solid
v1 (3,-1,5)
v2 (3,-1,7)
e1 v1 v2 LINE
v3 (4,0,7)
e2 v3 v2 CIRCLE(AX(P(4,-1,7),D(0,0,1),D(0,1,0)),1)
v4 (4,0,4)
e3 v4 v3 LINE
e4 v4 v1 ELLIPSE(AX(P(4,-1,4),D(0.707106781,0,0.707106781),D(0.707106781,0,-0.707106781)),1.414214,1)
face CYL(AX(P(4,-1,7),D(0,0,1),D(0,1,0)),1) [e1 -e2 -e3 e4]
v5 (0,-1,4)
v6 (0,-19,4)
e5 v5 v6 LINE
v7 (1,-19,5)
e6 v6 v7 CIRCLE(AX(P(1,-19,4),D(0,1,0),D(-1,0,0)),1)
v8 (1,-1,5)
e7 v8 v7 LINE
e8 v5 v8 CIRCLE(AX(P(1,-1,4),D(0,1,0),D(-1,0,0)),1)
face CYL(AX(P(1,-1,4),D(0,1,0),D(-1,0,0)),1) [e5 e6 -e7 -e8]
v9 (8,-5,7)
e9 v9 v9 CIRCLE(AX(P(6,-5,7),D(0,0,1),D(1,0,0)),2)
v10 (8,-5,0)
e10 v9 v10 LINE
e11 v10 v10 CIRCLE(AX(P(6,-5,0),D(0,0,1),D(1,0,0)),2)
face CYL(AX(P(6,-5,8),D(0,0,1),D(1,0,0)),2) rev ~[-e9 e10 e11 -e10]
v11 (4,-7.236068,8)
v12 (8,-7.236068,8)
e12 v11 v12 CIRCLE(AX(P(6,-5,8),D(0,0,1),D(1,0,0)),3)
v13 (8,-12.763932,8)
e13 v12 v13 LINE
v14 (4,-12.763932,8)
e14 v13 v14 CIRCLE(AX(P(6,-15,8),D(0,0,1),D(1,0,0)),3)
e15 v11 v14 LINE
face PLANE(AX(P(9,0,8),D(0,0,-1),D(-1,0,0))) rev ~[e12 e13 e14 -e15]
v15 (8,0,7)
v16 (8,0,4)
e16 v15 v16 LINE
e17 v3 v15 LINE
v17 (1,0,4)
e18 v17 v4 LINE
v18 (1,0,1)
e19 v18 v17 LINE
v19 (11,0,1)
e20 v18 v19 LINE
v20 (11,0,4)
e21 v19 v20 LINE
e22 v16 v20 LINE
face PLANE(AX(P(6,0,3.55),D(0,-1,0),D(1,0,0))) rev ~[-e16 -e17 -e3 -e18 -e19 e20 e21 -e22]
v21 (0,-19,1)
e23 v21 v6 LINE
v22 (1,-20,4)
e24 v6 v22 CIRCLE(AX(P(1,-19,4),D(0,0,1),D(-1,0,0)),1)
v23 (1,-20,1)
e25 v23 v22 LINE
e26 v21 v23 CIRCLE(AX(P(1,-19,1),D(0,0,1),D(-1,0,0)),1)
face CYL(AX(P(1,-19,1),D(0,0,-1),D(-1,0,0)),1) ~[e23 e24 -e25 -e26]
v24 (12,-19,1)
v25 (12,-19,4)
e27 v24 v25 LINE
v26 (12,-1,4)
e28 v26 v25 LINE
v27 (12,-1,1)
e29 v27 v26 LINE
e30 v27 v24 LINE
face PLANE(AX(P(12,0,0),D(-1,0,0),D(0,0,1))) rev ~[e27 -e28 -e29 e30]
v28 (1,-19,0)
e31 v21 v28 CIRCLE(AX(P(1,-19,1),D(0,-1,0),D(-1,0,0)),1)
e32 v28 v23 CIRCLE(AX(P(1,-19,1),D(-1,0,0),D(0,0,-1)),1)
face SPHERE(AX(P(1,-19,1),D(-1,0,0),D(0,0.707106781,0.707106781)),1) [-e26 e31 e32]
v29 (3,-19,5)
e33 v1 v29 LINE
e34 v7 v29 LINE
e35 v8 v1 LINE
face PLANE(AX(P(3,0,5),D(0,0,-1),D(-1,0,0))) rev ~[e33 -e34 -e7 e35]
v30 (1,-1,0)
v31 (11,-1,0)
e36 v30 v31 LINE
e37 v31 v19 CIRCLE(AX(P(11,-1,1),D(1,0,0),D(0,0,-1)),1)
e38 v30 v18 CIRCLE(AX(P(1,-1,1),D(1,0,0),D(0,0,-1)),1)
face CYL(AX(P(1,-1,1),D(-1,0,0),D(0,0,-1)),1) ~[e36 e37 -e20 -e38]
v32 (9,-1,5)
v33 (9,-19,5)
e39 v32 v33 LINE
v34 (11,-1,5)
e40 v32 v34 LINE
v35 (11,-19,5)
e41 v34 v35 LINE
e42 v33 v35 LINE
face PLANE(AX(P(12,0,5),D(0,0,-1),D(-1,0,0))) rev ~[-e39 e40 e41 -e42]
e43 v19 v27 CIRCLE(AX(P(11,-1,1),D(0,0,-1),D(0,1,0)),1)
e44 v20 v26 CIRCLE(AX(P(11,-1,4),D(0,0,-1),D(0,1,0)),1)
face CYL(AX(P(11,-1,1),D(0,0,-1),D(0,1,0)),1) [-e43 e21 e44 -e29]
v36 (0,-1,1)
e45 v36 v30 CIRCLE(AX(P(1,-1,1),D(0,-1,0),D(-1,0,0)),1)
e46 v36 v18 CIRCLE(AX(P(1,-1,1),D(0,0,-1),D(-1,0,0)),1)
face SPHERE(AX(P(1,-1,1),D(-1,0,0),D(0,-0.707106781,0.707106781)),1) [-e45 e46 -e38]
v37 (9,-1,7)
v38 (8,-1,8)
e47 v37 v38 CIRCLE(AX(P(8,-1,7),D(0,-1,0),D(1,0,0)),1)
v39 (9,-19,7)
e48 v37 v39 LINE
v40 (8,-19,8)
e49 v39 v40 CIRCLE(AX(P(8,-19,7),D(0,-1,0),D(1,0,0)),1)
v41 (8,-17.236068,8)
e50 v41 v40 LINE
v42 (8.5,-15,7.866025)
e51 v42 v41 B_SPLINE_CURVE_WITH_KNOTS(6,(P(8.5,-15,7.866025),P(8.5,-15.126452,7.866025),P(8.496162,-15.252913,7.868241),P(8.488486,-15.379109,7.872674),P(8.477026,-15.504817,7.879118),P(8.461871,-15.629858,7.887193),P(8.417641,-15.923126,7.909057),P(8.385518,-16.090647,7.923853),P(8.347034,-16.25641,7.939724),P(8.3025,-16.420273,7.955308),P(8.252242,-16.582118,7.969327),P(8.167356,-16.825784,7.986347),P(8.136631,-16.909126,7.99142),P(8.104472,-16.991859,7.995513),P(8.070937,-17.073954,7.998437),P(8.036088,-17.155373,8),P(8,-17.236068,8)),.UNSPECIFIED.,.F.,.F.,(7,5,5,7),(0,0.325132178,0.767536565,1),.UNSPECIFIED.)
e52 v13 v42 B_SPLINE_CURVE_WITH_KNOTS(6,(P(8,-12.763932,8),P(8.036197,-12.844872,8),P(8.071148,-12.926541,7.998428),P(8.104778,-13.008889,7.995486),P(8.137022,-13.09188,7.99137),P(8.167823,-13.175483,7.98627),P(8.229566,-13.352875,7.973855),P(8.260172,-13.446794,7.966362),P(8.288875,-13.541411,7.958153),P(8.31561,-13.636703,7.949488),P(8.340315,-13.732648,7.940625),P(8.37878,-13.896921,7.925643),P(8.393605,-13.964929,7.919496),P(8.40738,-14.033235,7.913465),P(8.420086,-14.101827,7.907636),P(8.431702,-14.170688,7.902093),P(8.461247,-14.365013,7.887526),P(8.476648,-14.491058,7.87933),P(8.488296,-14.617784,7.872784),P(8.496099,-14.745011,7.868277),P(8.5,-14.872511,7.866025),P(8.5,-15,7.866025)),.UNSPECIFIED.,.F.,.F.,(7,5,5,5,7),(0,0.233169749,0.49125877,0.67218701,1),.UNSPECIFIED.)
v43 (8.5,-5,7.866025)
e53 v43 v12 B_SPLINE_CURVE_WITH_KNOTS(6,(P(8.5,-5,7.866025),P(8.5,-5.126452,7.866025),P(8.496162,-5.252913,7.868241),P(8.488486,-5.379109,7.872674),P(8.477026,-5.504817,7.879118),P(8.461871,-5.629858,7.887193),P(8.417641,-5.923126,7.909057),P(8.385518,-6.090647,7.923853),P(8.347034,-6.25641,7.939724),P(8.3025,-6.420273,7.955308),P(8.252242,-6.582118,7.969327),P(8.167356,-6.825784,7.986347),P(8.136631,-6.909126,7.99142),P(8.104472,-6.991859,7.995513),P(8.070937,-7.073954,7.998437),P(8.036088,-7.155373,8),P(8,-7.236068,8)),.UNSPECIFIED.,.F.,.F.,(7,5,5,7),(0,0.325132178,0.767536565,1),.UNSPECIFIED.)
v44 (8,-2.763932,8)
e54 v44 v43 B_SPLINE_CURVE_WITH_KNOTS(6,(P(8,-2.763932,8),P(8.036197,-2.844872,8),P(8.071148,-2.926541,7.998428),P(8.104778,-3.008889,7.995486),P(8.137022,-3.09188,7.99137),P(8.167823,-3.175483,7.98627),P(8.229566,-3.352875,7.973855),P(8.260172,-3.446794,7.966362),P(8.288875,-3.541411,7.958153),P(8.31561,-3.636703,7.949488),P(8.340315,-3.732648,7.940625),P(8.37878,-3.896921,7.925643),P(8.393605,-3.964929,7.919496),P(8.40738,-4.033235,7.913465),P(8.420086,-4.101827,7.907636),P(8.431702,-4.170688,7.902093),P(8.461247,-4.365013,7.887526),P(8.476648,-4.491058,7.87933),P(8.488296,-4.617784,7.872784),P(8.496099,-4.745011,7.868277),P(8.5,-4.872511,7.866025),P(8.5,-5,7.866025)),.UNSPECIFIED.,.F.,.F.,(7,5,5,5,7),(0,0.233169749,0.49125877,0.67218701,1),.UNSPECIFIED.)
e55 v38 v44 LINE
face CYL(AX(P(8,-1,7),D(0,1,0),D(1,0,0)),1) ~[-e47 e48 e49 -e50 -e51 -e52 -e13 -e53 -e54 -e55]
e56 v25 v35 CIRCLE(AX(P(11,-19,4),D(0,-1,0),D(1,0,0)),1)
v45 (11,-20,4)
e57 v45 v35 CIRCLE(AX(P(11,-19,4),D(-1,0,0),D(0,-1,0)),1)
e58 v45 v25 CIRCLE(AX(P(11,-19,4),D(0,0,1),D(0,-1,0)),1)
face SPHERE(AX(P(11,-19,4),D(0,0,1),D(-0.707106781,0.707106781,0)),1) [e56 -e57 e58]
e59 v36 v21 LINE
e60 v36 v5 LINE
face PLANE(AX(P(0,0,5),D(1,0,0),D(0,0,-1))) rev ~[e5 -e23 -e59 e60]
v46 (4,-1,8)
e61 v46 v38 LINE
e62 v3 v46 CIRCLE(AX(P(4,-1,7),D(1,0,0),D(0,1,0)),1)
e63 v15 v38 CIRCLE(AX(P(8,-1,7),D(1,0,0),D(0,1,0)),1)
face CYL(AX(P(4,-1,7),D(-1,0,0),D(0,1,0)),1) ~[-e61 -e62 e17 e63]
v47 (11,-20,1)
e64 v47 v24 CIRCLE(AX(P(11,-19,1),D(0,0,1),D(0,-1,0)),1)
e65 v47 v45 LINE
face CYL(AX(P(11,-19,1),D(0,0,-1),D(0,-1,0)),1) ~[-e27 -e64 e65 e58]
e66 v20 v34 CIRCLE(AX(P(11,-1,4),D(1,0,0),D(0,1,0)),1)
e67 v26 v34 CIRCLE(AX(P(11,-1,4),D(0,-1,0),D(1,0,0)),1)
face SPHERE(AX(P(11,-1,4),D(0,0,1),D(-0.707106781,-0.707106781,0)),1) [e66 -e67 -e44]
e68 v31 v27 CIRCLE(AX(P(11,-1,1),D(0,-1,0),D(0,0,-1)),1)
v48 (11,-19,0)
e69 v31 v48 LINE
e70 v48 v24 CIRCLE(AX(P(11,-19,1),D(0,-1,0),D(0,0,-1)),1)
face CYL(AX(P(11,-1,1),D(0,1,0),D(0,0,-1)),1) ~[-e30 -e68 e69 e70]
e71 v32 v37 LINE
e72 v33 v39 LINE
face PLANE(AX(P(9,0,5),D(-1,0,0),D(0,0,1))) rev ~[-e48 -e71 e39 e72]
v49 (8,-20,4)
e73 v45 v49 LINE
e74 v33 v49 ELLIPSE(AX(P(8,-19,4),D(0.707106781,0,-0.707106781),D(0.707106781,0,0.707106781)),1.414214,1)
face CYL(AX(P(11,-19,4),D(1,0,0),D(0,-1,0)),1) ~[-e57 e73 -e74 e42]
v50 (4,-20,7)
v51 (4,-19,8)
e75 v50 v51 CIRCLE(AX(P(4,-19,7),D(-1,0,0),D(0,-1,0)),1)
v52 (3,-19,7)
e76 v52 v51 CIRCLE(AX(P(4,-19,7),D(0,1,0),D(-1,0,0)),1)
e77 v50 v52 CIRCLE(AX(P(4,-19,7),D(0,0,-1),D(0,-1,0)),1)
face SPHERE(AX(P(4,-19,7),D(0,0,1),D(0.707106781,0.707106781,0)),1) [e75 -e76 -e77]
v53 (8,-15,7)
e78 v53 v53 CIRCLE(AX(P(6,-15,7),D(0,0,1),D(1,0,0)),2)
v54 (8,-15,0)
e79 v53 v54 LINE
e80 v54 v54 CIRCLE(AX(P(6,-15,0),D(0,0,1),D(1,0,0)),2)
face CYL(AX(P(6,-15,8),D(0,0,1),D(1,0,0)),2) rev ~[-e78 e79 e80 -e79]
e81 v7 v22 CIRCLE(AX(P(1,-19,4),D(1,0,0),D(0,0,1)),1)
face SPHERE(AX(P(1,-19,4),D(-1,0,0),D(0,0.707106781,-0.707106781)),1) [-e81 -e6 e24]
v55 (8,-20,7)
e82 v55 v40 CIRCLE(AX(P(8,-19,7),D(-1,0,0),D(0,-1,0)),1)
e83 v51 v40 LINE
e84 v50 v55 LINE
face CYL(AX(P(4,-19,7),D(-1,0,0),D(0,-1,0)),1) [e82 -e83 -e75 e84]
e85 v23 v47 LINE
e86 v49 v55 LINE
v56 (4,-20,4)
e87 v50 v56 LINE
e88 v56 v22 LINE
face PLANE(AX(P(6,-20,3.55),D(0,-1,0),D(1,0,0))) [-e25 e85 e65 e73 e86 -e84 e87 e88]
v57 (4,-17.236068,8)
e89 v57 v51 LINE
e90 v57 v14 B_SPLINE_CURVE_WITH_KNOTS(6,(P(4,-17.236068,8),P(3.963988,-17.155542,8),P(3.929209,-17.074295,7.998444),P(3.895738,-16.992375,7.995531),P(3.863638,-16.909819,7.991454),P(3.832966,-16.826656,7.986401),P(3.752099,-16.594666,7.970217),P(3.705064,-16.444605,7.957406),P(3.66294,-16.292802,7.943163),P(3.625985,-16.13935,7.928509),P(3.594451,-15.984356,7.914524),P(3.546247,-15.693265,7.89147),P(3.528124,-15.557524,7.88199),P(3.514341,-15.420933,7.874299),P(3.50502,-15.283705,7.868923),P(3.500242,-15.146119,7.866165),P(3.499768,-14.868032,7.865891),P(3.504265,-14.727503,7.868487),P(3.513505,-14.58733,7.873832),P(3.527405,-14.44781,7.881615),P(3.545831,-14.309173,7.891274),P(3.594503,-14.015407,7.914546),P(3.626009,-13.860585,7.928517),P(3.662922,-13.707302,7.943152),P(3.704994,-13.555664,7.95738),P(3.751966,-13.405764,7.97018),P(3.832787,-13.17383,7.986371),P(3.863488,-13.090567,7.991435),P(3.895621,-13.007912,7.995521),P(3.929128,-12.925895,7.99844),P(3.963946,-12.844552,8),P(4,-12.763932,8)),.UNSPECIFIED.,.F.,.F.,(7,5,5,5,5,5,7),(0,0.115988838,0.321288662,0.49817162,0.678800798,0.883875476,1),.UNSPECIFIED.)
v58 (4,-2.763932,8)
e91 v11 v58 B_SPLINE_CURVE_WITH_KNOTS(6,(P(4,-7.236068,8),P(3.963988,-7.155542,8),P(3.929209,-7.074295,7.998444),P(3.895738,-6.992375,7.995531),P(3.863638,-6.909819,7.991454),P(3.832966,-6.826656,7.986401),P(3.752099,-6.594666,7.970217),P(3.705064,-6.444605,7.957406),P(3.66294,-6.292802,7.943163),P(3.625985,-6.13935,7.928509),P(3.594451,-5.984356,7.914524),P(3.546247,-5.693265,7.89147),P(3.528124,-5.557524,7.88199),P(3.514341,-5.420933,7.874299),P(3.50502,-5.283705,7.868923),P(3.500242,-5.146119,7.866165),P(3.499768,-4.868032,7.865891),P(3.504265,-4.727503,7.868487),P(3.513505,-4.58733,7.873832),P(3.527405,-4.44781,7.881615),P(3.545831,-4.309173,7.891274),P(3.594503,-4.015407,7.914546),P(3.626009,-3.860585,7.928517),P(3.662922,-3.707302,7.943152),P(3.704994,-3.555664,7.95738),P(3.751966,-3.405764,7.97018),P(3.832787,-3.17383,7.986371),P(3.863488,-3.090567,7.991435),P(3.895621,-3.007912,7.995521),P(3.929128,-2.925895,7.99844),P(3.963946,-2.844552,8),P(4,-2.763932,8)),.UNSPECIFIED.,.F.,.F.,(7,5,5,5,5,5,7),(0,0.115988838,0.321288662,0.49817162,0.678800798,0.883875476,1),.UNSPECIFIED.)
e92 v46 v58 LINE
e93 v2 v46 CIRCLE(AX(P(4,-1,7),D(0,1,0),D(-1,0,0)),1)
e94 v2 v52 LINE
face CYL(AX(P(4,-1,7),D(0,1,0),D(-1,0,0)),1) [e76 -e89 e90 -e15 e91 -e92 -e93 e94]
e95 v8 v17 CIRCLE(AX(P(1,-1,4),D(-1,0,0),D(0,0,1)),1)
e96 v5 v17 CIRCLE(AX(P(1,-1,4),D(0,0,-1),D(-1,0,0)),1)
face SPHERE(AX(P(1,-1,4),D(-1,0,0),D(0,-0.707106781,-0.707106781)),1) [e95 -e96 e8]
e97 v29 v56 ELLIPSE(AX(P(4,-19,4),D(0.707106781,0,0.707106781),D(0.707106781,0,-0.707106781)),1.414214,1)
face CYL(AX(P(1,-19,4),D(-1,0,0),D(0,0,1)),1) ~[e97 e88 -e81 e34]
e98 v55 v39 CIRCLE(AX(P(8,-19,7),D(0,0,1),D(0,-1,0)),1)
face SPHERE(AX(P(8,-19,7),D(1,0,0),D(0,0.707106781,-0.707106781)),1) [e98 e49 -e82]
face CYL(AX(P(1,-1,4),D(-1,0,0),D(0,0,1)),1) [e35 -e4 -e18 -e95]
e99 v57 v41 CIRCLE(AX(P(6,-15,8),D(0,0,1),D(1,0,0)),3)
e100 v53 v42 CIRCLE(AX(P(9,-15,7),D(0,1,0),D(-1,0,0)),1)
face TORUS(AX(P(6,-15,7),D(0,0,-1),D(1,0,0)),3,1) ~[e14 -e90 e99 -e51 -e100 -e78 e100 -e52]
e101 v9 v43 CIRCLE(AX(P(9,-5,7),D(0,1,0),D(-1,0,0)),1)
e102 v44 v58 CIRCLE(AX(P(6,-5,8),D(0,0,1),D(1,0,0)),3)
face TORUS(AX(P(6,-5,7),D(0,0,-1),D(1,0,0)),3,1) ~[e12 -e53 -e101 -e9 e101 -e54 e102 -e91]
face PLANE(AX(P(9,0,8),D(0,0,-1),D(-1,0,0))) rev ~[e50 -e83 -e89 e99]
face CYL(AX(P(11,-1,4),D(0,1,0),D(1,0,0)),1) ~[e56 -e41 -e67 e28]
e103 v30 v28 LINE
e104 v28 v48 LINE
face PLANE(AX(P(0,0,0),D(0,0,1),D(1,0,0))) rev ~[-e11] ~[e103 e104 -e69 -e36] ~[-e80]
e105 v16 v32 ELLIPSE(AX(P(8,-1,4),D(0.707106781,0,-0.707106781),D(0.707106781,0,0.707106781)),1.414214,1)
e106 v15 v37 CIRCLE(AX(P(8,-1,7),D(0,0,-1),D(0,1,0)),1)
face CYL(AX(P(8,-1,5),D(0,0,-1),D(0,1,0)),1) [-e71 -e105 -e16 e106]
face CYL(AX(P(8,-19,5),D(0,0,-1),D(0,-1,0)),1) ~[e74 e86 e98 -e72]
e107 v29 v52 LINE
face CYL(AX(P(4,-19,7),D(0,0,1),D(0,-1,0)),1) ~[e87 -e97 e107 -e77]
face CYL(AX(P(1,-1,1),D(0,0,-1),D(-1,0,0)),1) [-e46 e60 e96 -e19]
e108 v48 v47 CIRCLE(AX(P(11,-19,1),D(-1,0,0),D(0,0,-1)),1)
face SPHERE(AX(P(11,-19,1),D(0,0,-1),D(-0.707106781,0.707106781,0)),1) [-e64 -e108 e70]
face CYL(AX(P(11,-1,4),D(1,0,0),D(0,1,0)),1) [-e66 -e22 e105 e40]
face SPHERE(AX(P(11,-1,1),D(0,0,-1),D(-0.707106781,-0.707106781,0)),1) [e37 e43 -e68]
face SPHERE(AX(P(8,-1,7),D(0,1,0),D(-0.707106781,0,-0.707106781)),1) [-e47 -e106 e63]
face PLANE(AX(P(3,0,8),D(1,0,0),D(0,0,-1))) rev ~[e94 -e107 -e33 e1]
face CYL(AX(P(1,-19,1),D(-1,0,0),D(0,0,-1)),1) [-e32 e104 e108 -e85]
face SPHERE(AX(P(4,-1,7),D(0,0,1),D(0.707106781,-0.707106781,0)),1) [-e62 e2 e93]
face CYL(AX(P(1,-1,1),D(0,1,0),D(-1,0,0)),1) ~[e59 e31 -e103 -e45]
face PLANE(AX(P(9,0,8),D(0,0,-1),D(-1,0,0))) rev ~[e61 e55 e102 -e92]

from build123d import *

# Parameters (mm, degrees)
F1_DEPTH      = 20
F2_R          = 2
F3_DEPTH      = 8.001
F4_T1_DEPTH   = 18
F4_T3_DEPTH   = 4
F4_T5_DEPTH   = 3
F4_T7_DEPTH   = 10
F4_T9_DEPTH   = 2
F4_T11_DEPTH  = 2
F4_T13_DEPTH  = 2
F4_S17_W      = 1
F4_S17_H      = 1
F4_T18_DEPTH  = 1
F4_S23_W      = 1
F4_S23_H      = 1
F4_T24_DEPTH  = 1
F4_S29_W      = 1
F4_S29_H      = 1
F4_T30_DEPTH  = 1
F4_S35_W      = 1
F4_S35_H      = 1
F4_T36_DEPTH  = 1
F4_S41_W      = 1
F4_S41_H      = 1
F4_T42_DEPTH  = 1
F4_S47_W      = 1
F4_S47_H      = 1
F4_T48_DEPTH  = 1
F4_S53_W      = 1
F4_S53_H      = 1
F4_T54_DEPTH  = 1
F4_S59_W      = 1
F4_S59_H      = 1
F4_T60_DEPTH  = 1
F4_S65_W      = 1
F4_S65_H      = 1
F4_T66_DEPTH  = 1
F4_S71_W      = 1
F4_S71_H      = 1
F4_T72_DEPTH  = 1
F4_S77_W      = 1
F4_S77_H      = 1
F4_T78_DEPTH  = 1
F4_S83_W      = 1
F4_S83_H      = 1
F4_T84_DEPTH  = 1
F4_T95_DEPTH  = 4.5
F4_T99_DEPTH  = 4.5
F4_T106_DEPTH = 4.5
F4_T110_DEPTH = 4.5
F4_T117_DEPTH = 4.5
F4_T121_DEPTH = 4.5
F4_T128_DEPTH = 4.5
F4_T132_DEPTH = 4.5


# Not quite as in the source:
# - a fillet or chamfer that OpenCascade refuses, or shapes differently, is made with other operations: its cross-section is extruded or revolved along the edge and cut away or added


with BuildPart() as f1:
    # F0 (on Front) → F1 (new body)
    with BuildSketch(Plane.XZ):
        Polygon((0, 5), (0, 0), (12, 0), (12, 5), (9, 5), (9, 8), (3, 8), (3, 5), align=None)
    extrude(amount=F1_DEPTH)

    # F2 (on face) → F3 (cut, through all)
    with BuildSketch(Plane.XY.offset(8)):
        with Locations((6, -5)):
            Circle(F2_R)
        with Locations((6, -15)):
            Circle(F2_R)
    extrude(amount=-F3_DEPTH, mode=Mode.SUBTRACT)

    # F4: fillet of radius 1 on 24 edges, made by hand

    # F4_s2 → F4_t1 (cut)
    with BuildSketch(Plane.XZ.offset(1)):
        with BuildLine():
            ThreePointArc((9, 7), (8.7071067812, 7.7071067812), (8, 8))
            Line((8, 8), (9, 8))
            Line((9, 8), (9, 7))
        make_face()
        with BuildLine():
            ThreePointArc((3, 7), (3.2928932188, 7.7071067812), (4, 8))
            Line((4, 8), (3, 8))
            Line((3, 8), (3, 7))
        make_face()
        with BuildLine():
            ThreePointArc((11, 0), (11.7071067812, 0.2928932188), (12, 1))
            Line((12, 1), (12, 0))
            Line((12, 0), (11, 0))
        make_face()
        with BuildLine():
            ThreePointArc((12, 4), (11.7071067812, 4.7071067812), (11, 5))
            Line((11, 5), (12, 5))
            Line((12, 5), (12, 4))
        make_face()
        with BuildLine():
            ThreePointArc((0, 4), (0.2928932188, 4.7071067812), (1, 5))
            Line((1, 5), (0, 5))
            Line((0, 5), (0, 4))
        make_face()
        with BuildLine():
            ThreePointArc((0, 1), (0.2928932188, 0.2928932188), (1, 0))
            Line((1, 0), (0, 0))
            Line((0, 0), (0, 1))
        make_face()
    extrude(amount=F4_T1_DEPTH, mode=Mode.SUBTRACT)

    # F4_s4 → F4_t3 (cut)
    with BuildSketch(Plane.YZ.offset(4)):
        with BuildLine():
            ThreePointArc((0, 7), (-0.2928932188, 7.7071067812), (-1, 8))
            Line((-1, 8), (0, 8))
            Line((0, 8), (0, 7))
        make_face()
        with BuildLine():
            ThreePointArc((-20, 7), (-19.7071067812, 7.7071067812), (-19, 8))
            Line((-19, 8), (-20, 8))
            Line((-20, 8), (-20, 7))
        make_face()
    extrude(amount=F4_T3_DEPTH, mode=Mode.SUBTRACT)

    # F4_s6 → F4_t5 (cut)
    with BuildSketch(Plane.XY.offset(1)):
        with BuildLine():
            ThreePointArc((11, 0), (11.7071067812, -0.2928932188), (12, -1))
            Line((12, -1), (12, 0))
            Line((12, 0), (11, 0))
        make_face()
        with BuildLine():
            ThreePointArc((11, -20), (11.7071067812, -19.7071067812), (12, -19))
            Line((12, -19), (12, -20))
            Line((12, -20), (11, -20))
        make_face()
        with BuildLine():
            ThreePointArc((0, -1), (0.2928932188, -0.2928932188), (1, 0))
            Line((1, 0), (0, 0))
            Line((0, 0), (0, -1))
        make_face()
        with BuildLine():
            ThreePointArc((0, -19), (0.2928932188, -19.7071067812), (1, -20))
            Line((1, -20), (0, -20))
            Line((0, -20), (0, -19))
        make_face()
    extrude(amount=F4_T5_DEPTH, mode=Mode.SUBTRACT)

    # F4_s8 → F4_t7 (cut)
    with BuildSketch(Plane.YZ.offset(1)):
        with BuildLine():
            ThreePointArc((-19, 0), (-19.7071067812, 0.2928932188), (-20, 1))
            Line((-20, 1), (-20, 0))
            Line((-20, 0), (-19, 0))
        make_face()
        with BuildLine():
            ThreePointArc((-1, 0), (-0.2928932188, 0.2928932188), (0, 1))
            Line((0, 1), (0, 0))
            Line((0, 0), (-1, 0))
        make_face()
    extrude(amount=F4_T7_DEPTH, mode=Mode.SUBTRACT)

    # F4_s10 → F4_t9 (cut)
    with BuildSketch(Plane.YZ.offset(9)):
        with BuildLine():
            ThreePointArc((-20, 4), (-19.7071067812, 4.7071067812), (-19, 5))
            Line((-19, 5), (-20, 5))
            Line((-20, 5), (-20, 4))
        make_face()
        with BuildLine():
            ThreePointArc((0, 4), (-0.2928932188, 4.7071067812), (-1, 5))
            Line((-1, 5), (0, 5))
            Line((0, 5), (0, 4))
        make_face()
    extrude(amount=F4_T9_DEPTH, mode=Mode.SUBTRACT)

    # F4_s12 → F4_t11 (cut)
    with BuildSketch(Plane.XY.offset(5)):
        with BuildLine():
            ThreePointArc((8, -20), (8.7071067812, -19.7071067812), (9, -19))
            Line((9, -19), (9, -20))
            Line((9, -20), (8, -20))
        make_face()
        with BuildLine():
            ThreePointArc((4, -20), (3.2928932188, -19.7071067812), (3, -19))
            Line((3, -19), (3, -20))
            Line((3, -20), (4, -20))
        make_face()
        with BuildLine():
            ThreePointArc((8, 0), (8.7071067812, -0.2928932188), (9, -1))
            Line((9, -1), (9, 0))
            Line((9, 0), (8, 0))
        make_face()
        with BuildLine():
            ThreePointArc((4, 0), (3.2928932188, -0.2928932188), (3, -1))
            Line((3, -1), (3, 0))
            Line((3, 0), (4, 0))
        make_face()
    extrude(amount=F4_T11_DEPTH, mode=Mode.SUBTRACT)

    # F4_s14 → F4_t13 (cut)
    with BuildSketch(Plane.YZ.offset(1)):
        with BuildLine():
            ThreePointArc((-19, 5), (-19.7071067812, 4.7071067812), (-20, 4))
            Line((-20, 4), (-20, 5))
            Line((-20, 5), (-19, 5))
        make_face()
        with BuildLine():
            ThreePointArc((-1, 5), (-0.2928932188, 4.7071067812), (0, 4))
            Line((0, 4), (0, 5))
            Line((0, 5), (-1, 5))
        make_face()
    extrude(amount=F4_T13_DEPTH, mode=Mode.SUBTRACT)


with BuildPart() as f4_tool16:
    # F4_s17 → F4_t18 (new body)
    with BuildSketch(Plane.XZ.offset(1)):
        with Locations((8.5, 7.5)):
            Rectangle(F4_S17_W, F4_S17_H)
    extrude(amount=-F4_T18_DEPTH)

    # F4_s19 → F4_t20 (revolve, cut)
    with BuildSketch(Plane(origin=(8, -1, 7), x_dir=(-0.7071067812, 0, -0.7071067812), z_dir=(0.7071067812, 0, -0.7071067812))):
        with BuildLine():
            ThreePointArc((0, -1), (1, 0), (0, 1))
            Line((0, 1), (0, -1))
        make_face()
    revolve(axis=Axis((8, -1, 7), (0, 1, 0)), mode=Mode.SUBTRACT)


with BuildPart() as f1_1:
    add(f1.part)

    # F4_t15: cut F4_tool16
    add(f4_tool16.part, mode=Mode.SUBTRACT)


with BuildPart() as f4_tool22:
    # F4_s23 → F4_t24 (new body)
    with BuildSketch(Plane.YZ.offset(8)):
        with Locations((-19.5, 7.5)):
            Rectangle(F4_S23_W, F4_S23_H)
    extrude(amount=F4_T24_DEPTH)

    # F4_s25 → F4_t26 (revolve, cut)
    with BuildSketch(Plane(origin=(8, -19, 7), x_dir=(0, 0.7071067812, -0.7071067812), z_dir=(0, -0.7071067812, -0.7071067812))):
        with BuildLine():
            ThreePointArc((0, -1), (1, 0), (0, 1))
            Line((0, 1), (0, -1))
        make_face()
    revolve(axis=Axis((8, -19, 7), (1, 0, 0)), mode=Mode.SUBTRACT)


with BuildPart() as f1_2:
    add(f1_1.part)

    # F4_t21: cut F4_tool22
    add(f4_tool22.part, mode=Mode.SUBTRACT)


with BuildPart() as f4_tool28:
    # F4_s29 → F4_t30 (new body)
    with BuildSketch(Plane.XY.offset(7)):
        with Locations((3.5, -0.5)):
            Rectangle(F4_S29_W, F4_S29_H)
    extrude(amount=F4_T30_DEPTH)

    # F4_s31 → F4_t32 (revolve, cut)
    with BuildSketch(Plane(origin=(4, -1, 7), x_dir=(0.7071067812, -0.7071067812, 0), z_dir=(-0.7071067812, -0.7071067812, 0))):
        with BuildLine():
            ThreePointArc((0, -1), (1, 0), (0, 1))
            Line((0, 1), (0, -1))
        make_face()
    revolve(axis=Axis((4, -1, 7), (0, 0, 1)), mode=Mode.SUBTRACT)


with BuildPart() as f1_3:
    add(f1_2.part)

    # F4_t27: cut F4_tool28
    add(f4_tool28.part, mode=Mode.SUBTRACT)


with BuildPart() as f4_tool34:
    # F4_s35 → F4_t36 (new body)
    with BuildSketch(Plane.XY.offset(7)):
        with Locations((3.5, -19.5)):
            Rectangle(F4_S35_W, F4_S35_H)
    extrude(amount=F4_T36_DEPTH)

    # F4_s37 → F4_t38 (revolve, cut)
    with BuildSketch(Plane(origin=(4, -19, 7), x_dir=(0.7071067812, 0.7071067812, 0), z_dir=(0.7071067812, -0.7071067812, 0))):
        with BuildLine():
            ThreePointArc((0, -1), (1, 0), (0, 1))
            Line((0, 1), (0, -1))
        make_face()
    revolve(axis=Axis((4, -19, 7), (0, 0, 1)), mode=Mode.SUBTRACT)


with BuildPart() as f1_4:
    add(f1_3.part)

    # F4_t33: cut F4_tool34
    add(f4_tool34.part, mode=Mode.SUBTRACT)


with BuildPart() as f4_tool40:
    # F4_s41 → F4_t42 (new body)
    with BuildSketch(Plane.XY.offset(1)):
        with Locations((11.5, -0.5)):
            Rectangle(F4_S41_W, F4_S41_H)
    extrude(amount=-F4_T42_DEPTH)

    # F4_s43 → F4_t44 (revolve, cut)
    with BuildSketch(Plane(origin=(11, -1, 1), x_dir=(-0.7071067812, -0.7071067812, 0), z_dir=(0.7071067812, -0.7071067812, 0))):
        with BuildLine():
            ThreePointArc((0, -1), (1, 0), (0, 1))
            Line((0, 1), (0, -1))
        make_face()
    revolve(axis=Axis((11, -1, 1), (0, 0, -1)), mode=Mode.SUBTRACT)


with BuildPart() as f1_5:
    add(f1_4.part)

    # F4_t39: cut F4_tool40
    add(f4_tool40.part, mode=Mode.SUBTRACT)


with BuildPart() as f4_tool46:
    # F4_s47 → F4_t48 (new body)
    with BuildSketch(Plane.XY.offset(1)):
        with Locations((11.5, -19.5)):
            Rectangle(F4_S47_W, F4_S47_H)
    extrude(amount=-F4_T48_DEPTH)

    # F4_s49 → F4_t50 (revolve, cut)
    with BuildSketch(Plane(origin=(11, -19, 1), x_dir=(-0.7071067812, 0.7071067812, 0), z_dir=(-0.7071067812, -0.7071067812, 0))):
        with BuildLine():
            ThreePointArc((0, -1), (1, 0), (0, 1))
            Line((0, 1), (0, -1))
        make_face()
    revolve(axis=Axis((11, -19, 1), (0, 0, -1)), mode=Mode.SUBTRACT)


with BuildPart() as f1_6:
    add(f1_5.part)

    # F4_t45: cut F4_tool46
    add(f4_tool46.part, mode=Mode.SUBTRACT)


with BuildPart() as f4_tool52:
    # F4_s53 → F4_t54 (new body)
    with BuildSketch(Plane.XY.offset(4)):
        with Locations((11.5, -0.5)):
            Rectangle(F4_S53_W, F4_S53_H)
    extrude(amount=F4_T54_DEPTH)

    # F4_s55 → F4_t56 (revolve, cut)
    with BuildSketch(Plane(origin=(11, -1, 4), x_dir=(-0.7071067812, -0.7071067812, 0), z_dir=(-0.7071067812, 0.7071067812, 0))):
        with BuildLine():
            ThreePointArc((0, -1), (1, 0), (0, 1))
            Line((0, 1), (0, -1))
        make_face()
    revolve(axis=Axis((11, -1, 4), (0, 0, 1)), mode=Mode.SUBTRACT)


with BuildPart() as f1_7:
    add(f1_6.part)

    # F4_t51: cut F4_tool52
    add(f4_tool52.part, mode=Mode.SUBTRACT)


with BuildPart() as f4_tool58:
    # F4_s59 → F4_t60 (new body)
    with BuildSketch(Plane.XY.offset(4)):
        with Locations((11.5, -19.5)):
            Rectangle(F4_S59_W, F4_S59_H)
    extrude(amount=F4_T60_DEPTH)

    # F4_s61 → F4_t62 (revolve, cut)
    with BuildSketch(Plane(origin=(11, -19, 4), x_dir=(-0.7071067812, 0.7071067812, 0), z_dir=(0.7071067812, 0.7071067812, 0))):
        with BuildLine():
            ThreePointArc((0, -1), (1, 0), (0, 1))
            Line((0, 1), (0, -1))
        make_face()
    revolve(axis=Axis((11, -19, 4), (0, 0, 1)), mode=Mode.SUBTRACT)


with BuildPart() as f1_8:
    add(f1_7.part)

    # F4_t57: cut F4_tool58
    add(f4_tool58.part, mode=Mode.SUBTRACT)


with BuildPart() as f4_tool64:
    # F4_s65 → F4_t66 (new body)
    with BuildSketch(Plane.YZ.offset(1)):
        with Locations((-0.5, 4.5)):
            Rectangle(F4_S65_W, F4_S65_H)
    extrude(amount=-F4_T66_DEPTH)

    # F4_s67 → F4_t68 (revolve, cut)
    with BuildSketch(Plane(origin=(1, -1, 4), x_dir=(0, -0.7071067812, -0.7071067812), z_dir=(0, 0.7071067812, -0.7071067812))):
        with BuildLine():
            ThreePointArc((0, -1), (1, 0), (0, 1))
            Line((0, 1), (0, -1))
        make_face()
    revolve(axis=Axis((1, -1, 4), (-1, 0, 0)), mode=Mode.SUBTRACT)


with BuildPart() as f1_9:
    add(f1_8.part)

    # F4_t63: cut F4_tool64
    add(f4_tool64.part, mode=Mode.SUBTRACT)


with BuildPart() as f4_tool70:
    # F4_s71 → F4_t72 (new body)
    with BuildSketch(Plane.YZ.offset(1)):
        with Locations((-19.5, 4.5)):
            Rectangle(F4_S71_W, F4_S71_H)
    extrude(amount=-F4_T72_DEPTH)

    # F4_s73 → F4_t74 (revolve, cut)
    with BuildSketch(Plane(origin=(1, -19, 4), x_dir=(0, 0.7071067812, -0.7071067812), z_dir=(0, 0.7071067812, 0.7071067812))):
        with BuildLine():
            ThreePointArc((0, -1), (1, 0), (0, 1))
            Line((0, 1), (0, -1))
        make_face()
    revolve(axis=Axis((1, -19, 4), (-1, 0, 0)), mode=Mode.SUBTRACT)


with BuildPart() as f1_10:
    add(f1_9.part)

    # F4_t69: cut F4_tool70
    add(f4_tool70.part, mode=Mode.SUBTRACT)


with BuildPart() as f4_tool76:
    # F4_s77 → F4_t78 (new body)
    with BuildSketch(Plane.YZ.offset(1)):
        with Locations((-0.5, 0.5)):
            Rectangle(F4_S77_W, F4_S77_H)
    extrude(amount=-F4_T78_DEPTH)

    # F4_s79 → F4_t80 (revolve, cut)
    with BuildSketch(Plane(origin=(1, -1, 1), x_dir=(0, -0.7071067812, 0.7071067812), z_dir=(0, -0.7071067812, -0.7071067812))):
        with BuildLine():
            ThreePointArc((0, -1), (1, 0), (0, 1))
            Line((0, 1), (0, -1))
        make_face()
    revolve(axis=Axis((1, -1, 1), (-1, 0, 0)), mode=Mode.SUBTRACT)


with BuildPart() as f1_11:
    add(f1_10.part)

    # F4_t75: cut F4_tool76
    add(f4_tool76.part, mode=Mode.SUBTRACT)


with BuildPart() as f4_tool82:
    # F4_s83 → F4_t84 (new body)
    with BuildSketch(Plane.YZ.offset(1)):
        with Locations((-19.5, 0.5)):
            Rectangle(F4_S83_W, F4_S83_H)
    extrude(amount=-F4_T84_DEPTH)

    # F4_s85 → F4_t86 (revolve, cut)
    with BuildSketch(Plane(origin=(1, -19, 1), x_dir=(0, 0.7071067812, 0.7071067812), z_dir=(0, -0.7071067812, 0.7071067812))):
        with BuildLine():
            ThreePointArc((0, -1), (1, 0), (0, 1))
            Line((0, 1), (0, -1))
        make_face()
    revolve(axis=Axis((1, -19, 1), (-1, 0, 0)), mode=Mode.SUBTRACT)


with BuildPart() as f1_12:
    add(f1_11.part)

    # F4_t81: cut F4_tool82
    add(f4_tool82.part, mode=Mode.SUBTRACT)

    # F4_s87 → F4_t88 (revolve, cut)
    with BuildSketch(Plane.XZ.offset(15)):
        with BuildLine():
            ThreePointArc((8, 7), (8.2928932188, 7.7071067812), (9, 8))
            Line((9, 8), (8, 8))
            Line((8, 8), (8, 7))
        make_face()
    revolve(axis=Axis((6, -15, 8), (0, 0, 1)), mode=Mode.SUBTRACT)

    # F4_s89 → F4_t90 (revolve, cut)
    with BuildSketch(Plane.XZ.offset(5)):
        with BuildLine():
            ThreePointArc((8, 7), (8.2928932188, 7.7071067812), (9, 8))
            Line((9, 8), (8, 8))
            Line((8, 8), (8, 7))
        make_face()
    revolve(axis=Axis((6, -5, 8), (0, 0, 1)), mode=Mode.SUBTRACT)


with BuildPart() as f4_tool93:
    # F4_s94 → F4_t95 (new body)
    with BuildSketch(Plane.YZ.offset(11)):
        with BuildLine():
            ThreePointArc((-20, 4), (-19.7071067812, 4.7071067812), (-19, 5))
            Line((-19, 5), (-20, 5))
            Line((-20, 5), (-20, 4))
        make_face()
    extrude(amount=-F4_T95_DEPTH)

    split(bisect_by=Plane.YZ.offset(9), keep=Keep.BOTTOM)


with BuildPart() as f4_tool97:
    # F4_s98 → F4_t99 (new body)
    with BuildSketch(Plane.XY.offset(2.5)):
        with BuildLine():
            ThreePointArc((8, -20), (8.7071067812, -19.7071067812), (9, -19))
            Line((9, -19), (9, -20))
            Line((9, -20), (8, -20))
        make_face()
    extrude(amount=F4_T99_DEPTH)

    split(bisect_by=Plane.XY.offset(5), keep=Keep.BOTTOM)


with BuildPart() as f4_tool93_1:
    add(f4_tool93.part)

    # F4_t101: intersect F4_tool97
    add(f4_tool97.part, mode=Mode.INTERSECT)


with BuildPart() as f1_13:
    add(f1_12.part)

    # F4_t91: cut F4_tool93
    add(f4_tool93_1.part, mode=Mode.SUBTRACT)


with BuildPart() as f4_tool104:
    # F4_s105 → F4_t106 (new body)
    with BuildSketch(Plane.YZ.offset(5.5)):
        with BuildLine():
            ThreePointArc((-19, 5), (-19.7071067812, 4.7071067812), (-20, 4))
            Line((-20, 4), (-20, 5))
            Line((-20, 5), (-19, 5))
        make_face()
    extrude(amount=-F4_T106_DEPTH)

    split(bisect_by=Plane.YZ.offset(3), keep=Keep.TOP)


with BuildPart() as f4_tool108:
    # F4_s109 → F4_t110 (new body)
    with BuildSketch(Plane.XY.offset(7)):
        with BuildLine():
            ThreePointArc((4, -20), (3.2928932188, -19.7071067812), (3, -19))
            Line((3, -19), (3, -20))
            Line((3, -20), (4, -20))
        make_face()
    extrude(amount=-F4_T110_DEPTH)

    split(bisect_by=Plane.XY.offset(5), keep=Keep.BOTTOM)


with BuildPart() as f4_tool104_1:
    add(f4_tool104.part)

    # F4_t112: intersect F4_tool108
    add(f4_tool108.part, mode=Mode.INTERSECT)


with BuildPart() as f1_14:
    add(f1_13.part)

    # F4_t102: cut F4_tool104
    add(f4_tool104_1.part, mode=Mode.SUBTRACT)


with BuildPart() as f4_tool115:
    # F4_s116 → F4_t117 (new body)
    with BuildSketch(Plane.YZ.offset(11)):
        with BuildLine():
            ThreePointArc((0, 4), (-0.2928932188, 4.7071067812), (-1, 5))
            Line((-1, 5), (0, 5))
            Line((0, 5), (0, 4))
        make_face()
    extrude(amount=-F4_T117_DEPTH)

    split(bisect_by=Plane.YZ.offset(9), keep=Keep.BOTTOM)


with BuildPart() as f4_tool119:
    # F4_s120 → F4_t121 (new body)
    with BuildSketch(Plane.XY.offset(2.5)):
        with BuildLine():
            ThreePointArc((8, 0), (8.7071067812, -0.2928932188), (9, -1))
            Line((9, -1), (9, 0))
            Line((9, 0), (8, 0))
        make_face()
    extrude(amount=F4_T121_DEPTH)

    split(bisect_by=Plane.XY.offset(5), keep=Keep.BOTTOM)


with BuildPart() as f4_tool115_1:
    add(f4_tool115.part)

    # F4_t123: intersect F4_tool119
    add(f4_tool119.part, mode=Mode.INTERSECT)


with BuildPart() as f1_15:
    add(f1_14.part)

    # F4_t113: cut F4_tool115
    add(f4_tool115_1.part, mode=Mode.SUBTRACT)


with BuildPart() as f4_tool126:
    # F4_s127 → F4_t128 (new body)
    with BuildSketch(Plane.YZ.offset(5.5)):
        with BuildLine():
            ThreePointArc((-1, 5), (-0.2928932188, 4.7071067812), (0, 4))
            Line((0, 4), (0, 5))
            Line((0, 5), (-1, 5))
        make_face()
    extrude(amount=-F4_T128_DEPTH)

    split(bisect_by=Plane.YZ.offset(3), keep=Keep.TOP)


with BuildPart() as f4_tool130:
    # F4_s131 → F4_t132 (new body)
    with BuildSketch(Plane.XY.offset(7)):
        with BuildLine():
            ThreePointArc((4, 0), (3.2928932188, -0.2928932188), (3, -1))
            Line((3, -1), (3, 0))
            Line((3, 0), (4, 0))
        make_face()
    extrude(amount=-F4_T132_DEPTH)

    split(bisect_by=Plane.XY.offset(5), keep=Keep.BOTTOM)


with BuildPart() as f4_tool126_1:
    add(f4_tool126.part)

    # F4_t134: intersect F4_tool130
    add(f4_tool130.part, mode=Mode.INTERSECT)


with BuildPart() as f1_16:
    add(f1_15.part)

    # F4_t124: cut F4_tool126
    add(f4_tool126_1.part, mode=Mode.SUBTRACT)


solid = f1_16.part
